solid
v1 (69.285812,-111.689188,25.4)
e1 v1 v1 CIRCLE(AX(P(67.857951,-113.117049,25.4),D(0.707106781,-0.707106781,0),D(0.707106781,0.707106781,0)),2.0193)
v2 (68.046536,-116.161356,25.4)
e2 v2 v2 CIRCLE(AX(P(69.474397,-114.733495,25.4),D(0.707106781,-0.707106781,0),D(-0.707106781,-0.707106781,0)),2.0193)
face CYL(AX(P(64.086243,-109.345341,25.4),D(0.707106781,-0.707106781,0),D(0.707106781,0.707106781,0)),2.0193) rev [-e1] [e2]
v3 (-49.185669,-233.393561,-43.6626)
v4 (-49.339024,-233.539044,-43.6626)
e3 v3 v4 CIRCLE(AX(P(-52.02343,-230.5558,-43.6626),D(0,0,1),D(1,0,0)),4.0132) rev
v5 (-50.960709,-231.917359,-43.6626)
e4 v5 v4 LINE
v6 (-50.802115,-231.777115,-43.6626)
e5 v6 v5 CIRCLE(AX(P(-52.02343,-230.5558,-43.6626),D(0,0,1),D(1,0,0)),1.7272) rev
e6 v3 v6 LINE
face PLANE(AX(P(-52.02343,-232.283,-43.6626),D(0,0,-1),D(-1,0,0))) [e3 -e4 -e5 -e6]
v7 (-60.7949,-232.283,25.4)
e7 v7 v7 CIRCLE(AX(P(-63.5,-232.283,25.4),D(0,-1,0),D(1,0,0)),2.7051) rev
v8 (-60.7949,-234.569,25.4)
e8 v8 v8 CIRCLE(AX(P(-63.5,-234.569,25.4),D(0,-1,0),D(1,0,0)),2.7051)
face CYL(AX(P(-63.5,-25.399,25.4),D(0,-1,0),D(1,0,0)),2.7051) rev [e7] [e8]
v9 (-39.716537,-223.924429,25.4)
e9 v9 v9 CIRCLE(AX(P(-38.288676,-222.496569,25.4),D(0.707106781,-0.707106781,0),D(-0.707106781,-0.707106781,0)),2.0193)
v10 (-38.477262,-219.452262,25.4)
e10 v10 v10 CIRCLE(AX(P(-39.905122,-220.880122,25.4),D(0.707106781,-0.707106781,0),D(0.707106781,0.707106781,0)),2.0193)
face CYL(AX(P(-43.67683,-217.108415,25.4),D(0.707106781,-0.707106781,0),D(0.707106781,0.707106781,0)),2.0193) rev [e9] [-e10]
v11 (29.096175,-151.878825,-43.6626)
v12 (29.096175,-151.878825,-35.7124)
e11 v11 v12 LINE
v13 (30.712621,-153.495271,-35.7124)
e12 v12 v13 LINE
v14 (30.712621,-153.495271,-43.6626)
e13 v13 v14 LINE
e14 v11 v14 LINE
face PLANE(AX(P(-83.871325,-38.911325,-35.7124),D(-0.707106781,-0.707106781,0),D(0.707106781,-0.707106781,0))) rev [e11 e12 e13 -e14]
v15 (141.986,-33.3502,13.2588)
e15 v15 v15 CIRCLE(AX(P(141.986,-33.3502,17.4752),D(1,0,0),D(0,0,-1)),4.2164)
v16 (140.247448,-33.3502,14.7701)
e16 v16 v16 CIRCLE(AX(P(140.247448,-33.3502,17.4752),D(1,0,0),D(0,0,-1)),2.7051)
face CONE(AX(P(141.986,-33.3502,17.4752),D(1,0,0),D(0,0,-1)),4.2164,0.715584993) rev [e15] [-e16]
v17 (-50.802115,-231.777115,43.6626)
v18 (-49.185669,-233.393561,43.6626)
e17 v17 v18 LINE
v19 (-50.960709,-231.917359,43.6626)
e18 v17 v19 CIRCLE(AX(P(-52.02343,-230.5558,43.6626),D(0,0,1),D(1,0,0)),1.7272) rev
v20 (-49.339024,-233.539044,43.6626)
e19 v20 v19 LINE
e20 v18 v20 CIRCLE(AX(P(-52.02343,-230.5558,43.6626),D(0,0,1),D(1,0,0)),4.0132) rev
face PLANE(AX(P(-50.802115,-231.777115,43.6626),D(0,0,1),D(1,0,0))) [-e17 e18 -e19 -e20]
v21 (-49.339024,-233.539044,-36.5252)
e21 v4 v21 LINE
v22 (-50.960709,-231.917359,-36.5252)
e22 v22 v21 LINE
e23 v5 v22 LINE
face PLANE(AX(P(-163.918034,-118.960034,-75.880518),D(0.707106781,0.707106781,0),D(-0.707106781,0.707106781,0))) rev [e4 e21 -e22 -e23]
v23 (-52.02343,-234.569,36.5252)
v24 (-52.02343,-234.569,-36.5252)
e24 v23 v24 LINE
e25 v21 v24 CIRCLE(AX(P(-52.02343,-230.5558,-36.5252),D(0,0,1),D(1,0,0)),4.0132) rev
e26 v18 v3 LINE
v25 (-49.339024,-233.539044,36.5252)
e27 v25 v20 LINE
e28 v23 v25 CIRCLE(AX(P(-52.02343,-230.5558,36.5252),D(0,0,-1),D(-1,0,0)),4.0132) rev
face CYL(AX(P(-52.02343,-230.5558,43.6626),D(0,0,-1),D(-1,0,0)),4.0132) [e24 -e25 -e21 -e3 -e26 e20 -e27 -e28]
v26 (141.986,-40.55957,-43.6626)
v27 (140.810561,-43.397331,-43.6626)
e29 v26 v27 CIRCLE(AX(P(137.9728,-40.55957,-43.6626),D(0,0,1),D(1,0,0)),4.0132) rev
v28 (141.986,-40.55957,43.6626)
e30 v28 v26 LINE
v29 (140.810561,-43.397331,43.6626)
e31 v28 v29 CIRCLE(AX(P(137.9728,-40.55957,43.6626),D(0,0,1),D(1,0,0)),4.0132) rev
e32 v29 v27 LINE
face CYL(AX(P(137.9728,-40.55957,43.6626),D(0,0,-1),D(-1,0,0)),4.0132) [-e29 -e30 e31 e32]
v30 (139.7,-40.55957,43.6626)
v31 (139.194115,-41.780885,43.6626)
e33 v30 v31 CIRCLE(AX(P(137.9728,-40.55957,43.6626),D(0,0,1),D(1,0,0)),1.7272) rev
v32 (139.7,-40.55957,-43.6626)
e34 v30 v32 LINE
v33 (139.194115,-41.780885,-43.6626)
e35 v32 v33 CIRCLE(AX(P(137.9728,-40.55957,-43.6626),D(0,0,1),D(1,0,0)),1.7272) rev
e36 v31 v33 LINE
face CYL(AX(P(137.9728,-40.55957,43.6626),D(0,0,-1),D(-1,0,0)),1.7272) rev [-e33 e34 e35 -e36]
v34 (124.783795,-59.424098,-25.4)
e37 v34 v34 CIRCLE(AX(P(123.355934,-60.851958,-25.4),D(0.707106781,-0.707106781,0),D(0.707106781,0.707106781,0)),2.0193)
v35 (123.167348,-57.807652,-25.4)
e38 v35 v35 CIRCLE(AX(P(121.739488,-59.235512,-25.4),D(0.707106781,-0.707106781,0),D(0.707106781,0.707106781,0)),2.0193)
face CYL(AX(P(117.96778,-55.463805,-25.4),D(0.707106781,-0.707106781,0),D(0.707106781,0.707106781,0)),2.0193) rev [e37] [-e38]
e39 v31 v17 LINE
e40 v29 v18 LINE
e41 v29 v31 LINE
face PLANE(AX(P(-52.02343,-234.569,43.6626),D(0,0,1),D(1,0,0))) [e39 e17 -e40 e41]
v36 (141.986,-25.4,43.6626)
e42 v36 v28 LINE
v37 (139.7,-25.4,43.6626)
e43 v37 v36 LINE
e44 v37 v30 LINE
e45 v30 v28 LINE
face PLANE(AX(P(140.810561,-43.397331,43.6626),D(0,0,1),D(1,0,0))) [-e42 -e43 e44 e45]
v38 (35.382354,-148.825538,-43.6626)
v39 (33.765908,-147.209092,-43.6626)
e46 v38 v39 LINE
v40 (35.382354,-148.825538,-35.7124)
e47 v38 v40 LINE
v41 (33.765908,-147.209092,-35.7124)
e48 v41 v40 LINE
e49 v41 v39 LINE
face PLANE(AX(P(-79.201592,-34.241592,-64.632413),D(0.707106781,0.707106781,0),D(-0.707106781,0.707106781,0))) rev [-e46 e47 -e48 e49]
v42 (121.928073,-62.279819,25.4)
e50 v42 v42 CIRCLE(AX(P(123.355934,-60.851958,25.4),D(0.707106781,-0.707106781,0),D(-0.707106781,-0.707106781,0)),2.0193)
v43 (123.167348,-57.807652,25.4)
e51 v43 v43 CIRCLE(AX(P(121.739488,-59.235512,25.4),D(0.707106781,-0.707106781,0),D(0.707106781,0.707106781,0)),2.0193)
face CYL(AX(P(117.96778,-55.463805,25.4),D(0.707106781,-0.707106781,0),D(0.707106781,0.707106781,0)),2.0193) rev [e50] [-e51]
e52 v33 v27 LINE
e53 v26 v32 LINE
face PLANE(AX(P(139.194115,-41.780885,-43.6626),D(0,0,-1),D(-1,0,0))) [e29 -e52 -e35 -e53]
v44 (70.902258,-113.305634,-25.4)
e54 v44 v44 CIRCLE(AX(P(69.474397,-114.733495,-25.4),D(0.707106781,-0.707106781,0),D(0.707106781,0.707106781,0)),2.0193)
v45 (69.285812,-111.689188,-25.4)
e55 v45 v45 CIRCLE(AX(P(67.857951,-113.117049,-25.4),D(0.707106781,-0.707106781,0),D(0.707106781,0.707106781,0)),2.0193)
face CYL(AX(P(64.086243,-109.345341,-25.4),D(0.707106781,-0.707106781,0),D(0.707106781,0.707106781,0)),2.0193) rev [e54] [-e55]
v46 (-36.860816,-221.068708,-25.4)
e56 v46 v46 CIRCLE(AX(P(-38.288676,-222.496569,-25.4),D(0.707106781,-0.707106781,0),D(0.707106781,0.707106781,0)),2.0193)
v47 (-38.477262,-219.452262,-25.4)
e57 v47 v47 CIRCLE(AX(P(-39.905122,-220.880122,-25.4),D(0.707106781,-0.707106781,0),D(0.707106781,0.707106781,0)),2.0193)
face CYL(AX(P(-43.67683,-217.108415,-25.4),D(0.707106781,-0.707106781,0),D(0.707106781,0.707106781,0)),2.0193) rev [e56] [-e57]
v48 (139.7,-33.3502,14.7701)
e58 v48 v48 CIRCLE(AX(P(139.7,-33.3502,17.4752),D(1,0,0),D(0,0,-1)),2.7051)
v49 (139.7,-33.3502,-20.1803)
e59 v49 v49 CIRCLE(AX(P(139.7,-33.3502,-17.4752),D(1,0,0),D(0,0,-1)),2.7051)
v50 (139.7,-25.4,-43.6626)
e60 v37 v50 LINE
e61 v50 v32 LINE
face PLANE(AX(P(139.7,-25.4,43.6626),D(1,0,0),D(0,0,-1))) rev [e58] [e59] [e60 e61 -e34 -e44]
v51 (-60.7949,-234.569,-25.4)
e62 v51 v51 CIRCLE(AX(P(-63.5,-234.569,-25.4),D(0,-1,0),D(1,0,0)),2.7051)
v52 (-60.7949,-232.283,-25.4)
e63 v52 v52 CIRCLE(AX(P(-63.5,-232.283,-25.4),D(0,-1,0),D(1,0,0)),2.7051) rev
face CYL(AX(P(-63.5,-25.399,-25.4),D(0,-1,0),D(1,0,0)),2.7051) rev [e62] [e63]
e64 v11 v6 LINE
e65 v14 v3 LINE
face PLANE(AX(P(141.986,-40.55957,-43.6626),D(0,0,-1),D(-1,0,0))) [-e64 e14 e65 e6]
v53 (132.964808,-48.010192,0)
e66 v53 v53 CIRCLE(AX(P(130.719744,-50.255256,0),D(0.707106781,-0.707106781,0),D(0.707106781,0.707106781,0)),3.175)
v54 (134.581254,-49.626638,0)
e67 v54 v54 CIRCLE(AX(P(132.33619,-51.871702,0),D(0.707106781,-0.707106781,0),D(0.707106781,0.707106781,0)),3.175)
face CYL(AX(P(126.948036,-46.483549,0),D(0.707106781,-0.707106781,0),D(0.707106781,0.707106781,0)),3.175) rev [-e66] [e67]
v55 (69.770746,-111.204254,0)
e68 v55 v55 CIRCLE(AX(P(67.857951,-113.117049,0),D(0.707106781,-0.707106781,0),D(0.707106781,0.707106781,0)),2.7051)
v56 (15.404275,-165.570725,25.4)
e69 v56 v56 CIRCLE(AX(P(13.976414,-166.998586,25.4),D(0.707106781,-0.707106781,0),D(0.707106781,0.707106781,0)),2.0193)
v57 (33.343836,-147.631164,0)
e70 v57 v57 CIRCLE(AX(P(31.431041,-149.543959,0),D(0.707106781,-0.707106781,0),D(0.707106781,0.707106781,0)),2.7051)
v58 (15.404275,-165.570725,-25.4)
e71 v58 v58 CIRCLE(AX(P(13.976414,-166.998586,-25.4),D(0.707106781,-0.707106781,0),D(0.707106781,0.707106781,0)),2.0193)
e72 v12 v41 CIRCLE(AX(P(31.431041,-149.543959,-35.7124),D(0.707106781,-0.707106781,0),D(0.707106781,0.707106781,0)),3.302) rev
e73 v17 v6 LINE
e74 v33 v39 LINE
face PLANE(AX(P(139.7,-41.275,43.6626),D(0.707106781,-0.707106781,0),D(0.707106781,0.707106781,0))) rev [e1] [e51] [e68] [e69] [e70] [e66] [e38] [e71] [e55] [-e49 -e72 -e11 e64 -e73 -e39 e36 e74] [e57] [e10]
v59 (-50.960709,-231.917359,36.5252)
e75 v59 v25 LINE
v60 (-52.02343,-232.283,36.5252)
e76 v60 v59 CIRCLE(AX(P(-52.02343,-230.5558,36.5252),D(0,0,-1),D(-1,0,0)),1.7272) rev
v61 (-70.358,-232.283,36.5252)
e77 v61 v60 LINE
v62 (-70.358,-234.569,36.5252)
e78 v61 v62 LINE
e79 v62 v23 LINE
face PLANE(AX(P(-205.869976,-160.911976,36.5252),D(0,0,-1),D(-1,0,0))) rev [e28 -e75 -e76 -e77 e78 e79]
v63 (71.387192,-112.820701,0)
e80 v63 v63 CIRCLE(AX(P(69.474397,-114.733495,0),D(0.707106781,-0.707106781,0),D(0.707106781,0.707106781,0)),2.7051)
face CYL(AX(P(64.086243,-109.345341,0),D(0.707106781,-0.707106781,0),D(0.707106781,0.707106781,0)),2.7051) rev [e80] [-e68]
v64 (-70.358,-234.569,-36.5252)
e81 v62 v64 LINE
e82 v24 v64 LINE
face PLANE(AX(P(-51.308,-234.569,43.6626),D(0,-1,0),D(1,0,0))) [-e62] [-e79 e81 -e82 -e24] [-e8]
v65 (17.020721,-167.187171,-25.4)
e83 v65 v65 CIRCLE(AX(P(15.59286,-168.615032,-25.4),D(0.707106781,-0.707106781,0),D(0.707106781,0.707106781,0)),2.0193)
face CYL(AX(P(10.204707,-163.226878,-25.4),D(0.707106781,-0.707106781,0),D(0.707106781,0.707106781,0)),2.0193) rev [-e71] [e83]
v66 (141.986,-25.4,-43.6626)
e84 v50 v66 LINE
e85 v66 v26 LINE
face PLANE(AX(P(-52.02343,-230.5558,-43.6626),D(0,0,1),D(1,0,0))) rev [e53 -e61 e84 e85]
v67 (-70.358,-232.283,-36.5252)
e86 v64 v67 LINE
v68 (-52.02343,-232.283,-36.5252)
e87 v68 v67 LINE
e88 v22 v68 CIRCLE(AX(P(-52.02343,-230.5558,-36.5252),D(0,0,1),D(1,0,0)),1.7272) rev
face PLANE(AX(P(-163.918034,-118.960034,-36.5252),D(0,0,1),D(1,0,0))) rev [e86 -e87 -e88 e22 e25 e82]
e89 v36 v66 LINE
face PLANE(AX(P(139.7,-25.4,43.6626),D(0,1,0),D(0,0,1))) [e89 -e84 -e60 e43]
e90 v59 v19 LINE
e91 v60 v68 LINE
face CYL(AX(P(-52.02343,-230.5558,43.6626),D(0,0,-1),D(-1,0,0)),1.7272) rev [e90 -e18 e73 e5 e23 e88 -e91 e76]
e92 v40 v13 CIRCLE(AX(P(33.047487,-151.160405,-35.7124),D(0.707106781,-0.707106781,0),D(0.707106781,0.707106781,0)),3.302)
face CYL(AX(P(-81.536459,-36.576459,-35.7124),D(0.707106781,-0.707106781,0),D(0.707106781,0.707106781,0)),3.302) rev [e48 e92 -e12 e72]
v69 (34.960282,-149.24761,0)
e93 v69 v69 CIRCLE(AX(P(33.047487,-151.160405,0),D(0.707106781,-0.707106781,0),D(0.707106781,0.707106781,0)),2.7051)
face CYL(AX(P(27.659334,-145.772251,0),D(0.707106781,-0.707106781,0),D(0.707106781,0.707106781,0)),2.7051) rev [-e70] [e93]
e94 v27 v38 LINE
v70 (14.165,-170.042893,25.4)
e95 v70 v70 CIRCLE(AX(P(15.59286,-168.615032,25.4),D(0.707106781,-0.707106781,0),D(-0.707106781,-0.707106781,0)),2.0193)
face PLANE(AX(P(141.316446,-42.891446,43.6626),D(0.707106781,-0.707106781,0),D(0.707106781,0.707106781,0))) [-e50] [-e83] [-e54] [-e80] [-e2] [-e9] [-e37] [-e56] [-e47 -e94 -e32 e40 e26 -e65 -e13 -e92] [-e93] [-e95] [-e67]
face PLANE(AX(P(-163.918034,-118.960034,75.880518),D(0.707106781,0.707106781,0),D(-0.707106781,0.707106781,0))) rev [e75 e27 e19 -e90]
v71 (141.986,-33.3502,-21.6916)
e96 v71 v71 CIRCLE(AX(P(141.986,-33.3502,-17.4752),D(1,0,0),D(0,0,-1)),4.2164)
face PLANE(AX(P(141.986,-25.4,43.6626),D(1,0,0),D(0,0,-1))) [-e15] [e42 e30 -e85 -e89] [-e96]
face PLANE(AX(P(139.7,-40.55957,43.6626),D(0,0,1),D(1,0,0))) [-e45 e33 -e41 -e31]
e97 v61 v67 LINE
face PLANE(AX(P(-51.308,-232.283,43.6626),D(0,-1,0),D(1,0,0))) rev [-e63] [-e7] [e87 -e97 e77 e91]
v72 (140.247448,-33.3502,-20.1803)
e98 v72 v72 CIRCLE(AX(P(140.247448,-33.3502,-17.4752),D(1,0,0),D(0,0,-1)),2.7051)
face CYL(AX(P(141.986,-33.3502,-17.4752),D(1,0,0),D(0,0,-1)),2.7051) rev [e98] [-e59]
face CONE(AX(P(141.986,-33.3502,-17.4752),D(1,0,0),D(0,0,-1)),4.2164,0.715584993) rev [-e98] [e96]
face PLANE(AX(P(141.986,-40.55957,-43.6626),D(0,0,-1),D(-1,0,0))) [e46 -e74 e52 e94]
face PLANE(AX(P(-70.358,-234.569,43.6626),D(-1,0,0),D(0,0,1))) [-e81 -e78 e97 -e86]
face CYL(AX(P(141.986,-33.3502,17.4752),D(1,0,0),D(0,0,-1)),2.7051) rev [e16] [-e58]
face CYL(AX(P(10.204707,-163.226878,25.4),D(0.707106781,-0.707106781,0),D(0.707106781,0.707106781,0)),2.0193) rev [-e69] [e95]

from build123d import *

# Parameters (mm, degrees)
BASE_FLANGE1_DEPTH                            = 43.6626
SKETCH3_W                                     = 39.3553177
SKETCH3_H                                     = 59.329005091
CUT_EXTRUDE1_DEPTH                            = 221.446361168
CSK_FOR_8_FLAT_HEAD_MACHINE_SCREW1_AT_2_COUNT = 2
CSK_FOR_8_FLAT_HEAD_MACHINE_SCREW1_AT_2_PITCH = 34.9504
SKETCH6_R                                     = 3.175
SKETCH6_R_2                                   = 2.0193
SKETCH6_R_3                                   = 2.7051
CUT_EXTRUDE2_DEPTH                            = 7.62
CUT_EXTRUDE3_REACH                            = 258.55
SKETCH7_R                                     = 2.7051
CE_00_NOTCH_FOR_WIRE_REACH                    = 222.446


# Sheet-metal steps are written as plain solids
with BuildPart() as part:
    # Sketch1 → Base-Flange1 (new, symmetric)
    with BuildSketch(Plane.XY):
        with BuildLine():
            Line((139.7, -25.4), (139.7, -40.559570335))
            ThreePointArc((139.7, -40.559570335), (139.568524729, -41.220541159), (139.194114832, -41.780885168))
            Line((139.194114832, -41.780885168), (-50.802114832, -231.777114832))
            ThreePointArc((-50.802114832, -231.777114832), (-51.362458841, -232.151524729), (-52.023429665, -232.283))
            Line((-52.023429665, -232.283), (-70.358, -232.283))
            Line((-70.358, -232.283), (-70.358, -234.569))
            Line((-70.358, -234.569), (-52.023429665, -234.569))
            ThreePointArc((-52.023429665, -234.569), (-50.487644514, -234.26351334), (-49.185668731, -233.393560934))
            Line((-49.185668731, -233.393560934), (140.810560934, -43.397331269))
            ThreePointArc((140.810560934, -43.397331269), (141.68051334, -42.095355486), (141.986, -40.559570335))
            Line((141.986, -40.559570335), (141.986, -25.4))
            Line((141.986, -25.4), (139.7, -25.4))
        make_face()
    extrude(amount=BASE_FLANGE1_DEPTH, both=True)

    # Sketch3 → Cut-Extrude1 (cut, through all)
    with BuildSketch(Plane(origin=(92.103946102, -92.103946102, 0), x_dir=(0, 0, -1), z_dir=(0.7071067811865464, -0.7071067811865487, 0))):
        with Locations((-56.20285885, -229.689502546)):
            Rectangle(SKETCH3_W, SKETCH3_H)
        with Locations((56.20285885, -229.689502546)):
            Rectangle(SKETCH3_W, SKETCH3_H)
    extrude(amount=-CUT_EXTRUDE1_DEPTH, mode=Mode.SUBTRACT)

    # Sketch4 → CSK for #8 Flat Head Machine Screw1 (revolve, cut)
    with BuildSketch(Plane(origin=(141.986, -33.3502, -17.4752), x_dir=(0, 0, -1), z_dir=(0, 1, 0))):
        Polygon((0, 0), (0, 2.286), (2.7051, 2.286), (2.7051, 1.738551774), (4.2164, 0), align=None)
    csk_for_8_flat_head_machine_screw1 = revolve(axis=Axis((148.336, -33.3502, -17.4752), (-1, 0, 0)), mode=Mode.SUBTRACT)

    # CSK for #8 Flat Head Machine Screw1 at 2: CSK for #8 Flat Head Machine Screw1 ×2
    with Locations(*[(0, 0, i * CSK_FOR_8_FLAT_HEAD_MACHINE_SCREW1_AT_2_PITCH) for i in range(1, CSK_FOR_8_FLAT_HEAD_MACHINE_SCREW1_AT_2_COUNT)]):
        add(csk_for_8_flat_head_machine_screw1, mode=Mode.SUBTRACT)

    # Sketch6 → Cut-Extrude2 (cut)
    with BuildSketch(Plane(origin=(92.103946102, -92.103946102, 0), x_dir=(0, 0, -1), z_dir=(0.7071067811865465, -0.7071067811865486, 0))):
        with Locations(Location((0, 56.896984938, 0), (0, 0, 90))):
            Circle(SKETCH6_R)
        with Locations(Location((25.4, 44.196984938, 0), (0, 0, 90))):
            Circle(SKETCH6_R_2)
        with Locations(Location((25.4, -32.003015062, 0), (0, 0, 90))):
            Circle(SKETCH6_R_2)
        with Locations(Location((25.4, -108.203015062, 0), (0, 0, 90))):
            Circle(SKETCH6_R_2)
        with Locations(Location((-25.4, -108.203015062, 0), (0, 0, 90))):
            Circle(SKETCH6_R_2)
        with Locations(Location((-25.4, -32.003015062, 0), (0, 0, 90))):
            Circle(SKETCH6_R_2)
        with Locations(Location((-25.4, 44.196984938, 0), (0, 0, 90))):
            Circle(SKETCH6_R_2)
        with Locations(Location((0, -32.003015062, 0), (0, 0, 90))):
            Circle(SKETCH6_R_3)
        with Locations(Location((25.4, -184.403015062, 0), (0, 0, 90))):
            Circle(SKETCH6_R_2)
        with Locations(Location((-25.4, -184.403015062, 0), (0, 0, 90))):
            Circle(SKETCH6_R_2)
        with Locations(Location((0, -83.518444727, 0), (0, 0, 90))):
            Circle(SKETCH6_R_3)
    extrude(amount=-CUT_EXTRUDE2_DEPTH, mode=Mode.SUBTRACT)

    # Sketch7 → Cut-Extrude3 (cut, up to next)
    with BuildSketch(Plane.XZ.offset(234.569), mode=Mode.PRIVATE) as cut_extrude3_sk1:
        with Locations((-63.5, 25.4)):
            Circle(SKETCH7_R)
    cut_extrude3_tool1 = extrude(cut_extrude3_sk1.sketch, amount=-CUT_EXTRUDE3_REACH, mode=Mode.PRIVATE) & part.part
    # Sketch7 → Cut-Extrude3 (cut, up to next)
    with BuildSketch(Plane.XZ.offset(234.569), mode=Mode.PRIVATE) as cut_extrude3_sk2:
        with Locations((-63.5, -25.4)):
            Circle(SKETCH7_R)
    cut_extrude3_tool2 = extrude(cut_extrude3_sk2.sketch, amount=-CUT_EXTRUDE3_REACH, mode=Mode.PRIVATE) & part.part
    add(cut_extrude3_tool1.solids().sort_by_distance((-63.5, -234.569, 25.4))[0], mode=Mode.SUBTRACT)
    add(cut_extrude3_tool2.solids().sort_by_distance((-63.5, -234.569, -25.4))[0], mode=Mode.SUBTRACT)

    # Sketch8 → CE-00 Notch for Wire (cut, up to next)
    with BuildSketch(Plane(origin=(92.103946102, -92.103946102, 0), x_dir=(0, 0, -1), z_dir=(0.7071067811865465, -0.7071067811865486, 0)), mode=Mode.PRIVATE) as ce_00_notch_for_wire_sk1:
        with BuildLine():
            Line((64.632412862, -80.216444727), (35.7124, -80.216444727))
            ThreePointArc((35.7124, -80.216444727), (32.4104, -83.518444727), (35.7124, -86.820444727))
            Line((35.7124, -86.820444727), (64.632412862, -86.820444727))
            Line((64.632412862, -86.820444727), (64.632412862, -80.216444727))
        make_face()
    ce_00_notch_for_wire_tool1 = extrude(ce_00_notch_for_wire_sk1.sketch, amount=-CE_00_NOTCH_FOR_WIRE_REACH, mode=Mode.PRIVATE) & part.part
    add(ce_00_notch_for_wire_tool1.solids().sort_by_distance((33.047487, -151.160405, -48.867096))[0], mode=Mode.SUBTRACT)


solid = part.part
